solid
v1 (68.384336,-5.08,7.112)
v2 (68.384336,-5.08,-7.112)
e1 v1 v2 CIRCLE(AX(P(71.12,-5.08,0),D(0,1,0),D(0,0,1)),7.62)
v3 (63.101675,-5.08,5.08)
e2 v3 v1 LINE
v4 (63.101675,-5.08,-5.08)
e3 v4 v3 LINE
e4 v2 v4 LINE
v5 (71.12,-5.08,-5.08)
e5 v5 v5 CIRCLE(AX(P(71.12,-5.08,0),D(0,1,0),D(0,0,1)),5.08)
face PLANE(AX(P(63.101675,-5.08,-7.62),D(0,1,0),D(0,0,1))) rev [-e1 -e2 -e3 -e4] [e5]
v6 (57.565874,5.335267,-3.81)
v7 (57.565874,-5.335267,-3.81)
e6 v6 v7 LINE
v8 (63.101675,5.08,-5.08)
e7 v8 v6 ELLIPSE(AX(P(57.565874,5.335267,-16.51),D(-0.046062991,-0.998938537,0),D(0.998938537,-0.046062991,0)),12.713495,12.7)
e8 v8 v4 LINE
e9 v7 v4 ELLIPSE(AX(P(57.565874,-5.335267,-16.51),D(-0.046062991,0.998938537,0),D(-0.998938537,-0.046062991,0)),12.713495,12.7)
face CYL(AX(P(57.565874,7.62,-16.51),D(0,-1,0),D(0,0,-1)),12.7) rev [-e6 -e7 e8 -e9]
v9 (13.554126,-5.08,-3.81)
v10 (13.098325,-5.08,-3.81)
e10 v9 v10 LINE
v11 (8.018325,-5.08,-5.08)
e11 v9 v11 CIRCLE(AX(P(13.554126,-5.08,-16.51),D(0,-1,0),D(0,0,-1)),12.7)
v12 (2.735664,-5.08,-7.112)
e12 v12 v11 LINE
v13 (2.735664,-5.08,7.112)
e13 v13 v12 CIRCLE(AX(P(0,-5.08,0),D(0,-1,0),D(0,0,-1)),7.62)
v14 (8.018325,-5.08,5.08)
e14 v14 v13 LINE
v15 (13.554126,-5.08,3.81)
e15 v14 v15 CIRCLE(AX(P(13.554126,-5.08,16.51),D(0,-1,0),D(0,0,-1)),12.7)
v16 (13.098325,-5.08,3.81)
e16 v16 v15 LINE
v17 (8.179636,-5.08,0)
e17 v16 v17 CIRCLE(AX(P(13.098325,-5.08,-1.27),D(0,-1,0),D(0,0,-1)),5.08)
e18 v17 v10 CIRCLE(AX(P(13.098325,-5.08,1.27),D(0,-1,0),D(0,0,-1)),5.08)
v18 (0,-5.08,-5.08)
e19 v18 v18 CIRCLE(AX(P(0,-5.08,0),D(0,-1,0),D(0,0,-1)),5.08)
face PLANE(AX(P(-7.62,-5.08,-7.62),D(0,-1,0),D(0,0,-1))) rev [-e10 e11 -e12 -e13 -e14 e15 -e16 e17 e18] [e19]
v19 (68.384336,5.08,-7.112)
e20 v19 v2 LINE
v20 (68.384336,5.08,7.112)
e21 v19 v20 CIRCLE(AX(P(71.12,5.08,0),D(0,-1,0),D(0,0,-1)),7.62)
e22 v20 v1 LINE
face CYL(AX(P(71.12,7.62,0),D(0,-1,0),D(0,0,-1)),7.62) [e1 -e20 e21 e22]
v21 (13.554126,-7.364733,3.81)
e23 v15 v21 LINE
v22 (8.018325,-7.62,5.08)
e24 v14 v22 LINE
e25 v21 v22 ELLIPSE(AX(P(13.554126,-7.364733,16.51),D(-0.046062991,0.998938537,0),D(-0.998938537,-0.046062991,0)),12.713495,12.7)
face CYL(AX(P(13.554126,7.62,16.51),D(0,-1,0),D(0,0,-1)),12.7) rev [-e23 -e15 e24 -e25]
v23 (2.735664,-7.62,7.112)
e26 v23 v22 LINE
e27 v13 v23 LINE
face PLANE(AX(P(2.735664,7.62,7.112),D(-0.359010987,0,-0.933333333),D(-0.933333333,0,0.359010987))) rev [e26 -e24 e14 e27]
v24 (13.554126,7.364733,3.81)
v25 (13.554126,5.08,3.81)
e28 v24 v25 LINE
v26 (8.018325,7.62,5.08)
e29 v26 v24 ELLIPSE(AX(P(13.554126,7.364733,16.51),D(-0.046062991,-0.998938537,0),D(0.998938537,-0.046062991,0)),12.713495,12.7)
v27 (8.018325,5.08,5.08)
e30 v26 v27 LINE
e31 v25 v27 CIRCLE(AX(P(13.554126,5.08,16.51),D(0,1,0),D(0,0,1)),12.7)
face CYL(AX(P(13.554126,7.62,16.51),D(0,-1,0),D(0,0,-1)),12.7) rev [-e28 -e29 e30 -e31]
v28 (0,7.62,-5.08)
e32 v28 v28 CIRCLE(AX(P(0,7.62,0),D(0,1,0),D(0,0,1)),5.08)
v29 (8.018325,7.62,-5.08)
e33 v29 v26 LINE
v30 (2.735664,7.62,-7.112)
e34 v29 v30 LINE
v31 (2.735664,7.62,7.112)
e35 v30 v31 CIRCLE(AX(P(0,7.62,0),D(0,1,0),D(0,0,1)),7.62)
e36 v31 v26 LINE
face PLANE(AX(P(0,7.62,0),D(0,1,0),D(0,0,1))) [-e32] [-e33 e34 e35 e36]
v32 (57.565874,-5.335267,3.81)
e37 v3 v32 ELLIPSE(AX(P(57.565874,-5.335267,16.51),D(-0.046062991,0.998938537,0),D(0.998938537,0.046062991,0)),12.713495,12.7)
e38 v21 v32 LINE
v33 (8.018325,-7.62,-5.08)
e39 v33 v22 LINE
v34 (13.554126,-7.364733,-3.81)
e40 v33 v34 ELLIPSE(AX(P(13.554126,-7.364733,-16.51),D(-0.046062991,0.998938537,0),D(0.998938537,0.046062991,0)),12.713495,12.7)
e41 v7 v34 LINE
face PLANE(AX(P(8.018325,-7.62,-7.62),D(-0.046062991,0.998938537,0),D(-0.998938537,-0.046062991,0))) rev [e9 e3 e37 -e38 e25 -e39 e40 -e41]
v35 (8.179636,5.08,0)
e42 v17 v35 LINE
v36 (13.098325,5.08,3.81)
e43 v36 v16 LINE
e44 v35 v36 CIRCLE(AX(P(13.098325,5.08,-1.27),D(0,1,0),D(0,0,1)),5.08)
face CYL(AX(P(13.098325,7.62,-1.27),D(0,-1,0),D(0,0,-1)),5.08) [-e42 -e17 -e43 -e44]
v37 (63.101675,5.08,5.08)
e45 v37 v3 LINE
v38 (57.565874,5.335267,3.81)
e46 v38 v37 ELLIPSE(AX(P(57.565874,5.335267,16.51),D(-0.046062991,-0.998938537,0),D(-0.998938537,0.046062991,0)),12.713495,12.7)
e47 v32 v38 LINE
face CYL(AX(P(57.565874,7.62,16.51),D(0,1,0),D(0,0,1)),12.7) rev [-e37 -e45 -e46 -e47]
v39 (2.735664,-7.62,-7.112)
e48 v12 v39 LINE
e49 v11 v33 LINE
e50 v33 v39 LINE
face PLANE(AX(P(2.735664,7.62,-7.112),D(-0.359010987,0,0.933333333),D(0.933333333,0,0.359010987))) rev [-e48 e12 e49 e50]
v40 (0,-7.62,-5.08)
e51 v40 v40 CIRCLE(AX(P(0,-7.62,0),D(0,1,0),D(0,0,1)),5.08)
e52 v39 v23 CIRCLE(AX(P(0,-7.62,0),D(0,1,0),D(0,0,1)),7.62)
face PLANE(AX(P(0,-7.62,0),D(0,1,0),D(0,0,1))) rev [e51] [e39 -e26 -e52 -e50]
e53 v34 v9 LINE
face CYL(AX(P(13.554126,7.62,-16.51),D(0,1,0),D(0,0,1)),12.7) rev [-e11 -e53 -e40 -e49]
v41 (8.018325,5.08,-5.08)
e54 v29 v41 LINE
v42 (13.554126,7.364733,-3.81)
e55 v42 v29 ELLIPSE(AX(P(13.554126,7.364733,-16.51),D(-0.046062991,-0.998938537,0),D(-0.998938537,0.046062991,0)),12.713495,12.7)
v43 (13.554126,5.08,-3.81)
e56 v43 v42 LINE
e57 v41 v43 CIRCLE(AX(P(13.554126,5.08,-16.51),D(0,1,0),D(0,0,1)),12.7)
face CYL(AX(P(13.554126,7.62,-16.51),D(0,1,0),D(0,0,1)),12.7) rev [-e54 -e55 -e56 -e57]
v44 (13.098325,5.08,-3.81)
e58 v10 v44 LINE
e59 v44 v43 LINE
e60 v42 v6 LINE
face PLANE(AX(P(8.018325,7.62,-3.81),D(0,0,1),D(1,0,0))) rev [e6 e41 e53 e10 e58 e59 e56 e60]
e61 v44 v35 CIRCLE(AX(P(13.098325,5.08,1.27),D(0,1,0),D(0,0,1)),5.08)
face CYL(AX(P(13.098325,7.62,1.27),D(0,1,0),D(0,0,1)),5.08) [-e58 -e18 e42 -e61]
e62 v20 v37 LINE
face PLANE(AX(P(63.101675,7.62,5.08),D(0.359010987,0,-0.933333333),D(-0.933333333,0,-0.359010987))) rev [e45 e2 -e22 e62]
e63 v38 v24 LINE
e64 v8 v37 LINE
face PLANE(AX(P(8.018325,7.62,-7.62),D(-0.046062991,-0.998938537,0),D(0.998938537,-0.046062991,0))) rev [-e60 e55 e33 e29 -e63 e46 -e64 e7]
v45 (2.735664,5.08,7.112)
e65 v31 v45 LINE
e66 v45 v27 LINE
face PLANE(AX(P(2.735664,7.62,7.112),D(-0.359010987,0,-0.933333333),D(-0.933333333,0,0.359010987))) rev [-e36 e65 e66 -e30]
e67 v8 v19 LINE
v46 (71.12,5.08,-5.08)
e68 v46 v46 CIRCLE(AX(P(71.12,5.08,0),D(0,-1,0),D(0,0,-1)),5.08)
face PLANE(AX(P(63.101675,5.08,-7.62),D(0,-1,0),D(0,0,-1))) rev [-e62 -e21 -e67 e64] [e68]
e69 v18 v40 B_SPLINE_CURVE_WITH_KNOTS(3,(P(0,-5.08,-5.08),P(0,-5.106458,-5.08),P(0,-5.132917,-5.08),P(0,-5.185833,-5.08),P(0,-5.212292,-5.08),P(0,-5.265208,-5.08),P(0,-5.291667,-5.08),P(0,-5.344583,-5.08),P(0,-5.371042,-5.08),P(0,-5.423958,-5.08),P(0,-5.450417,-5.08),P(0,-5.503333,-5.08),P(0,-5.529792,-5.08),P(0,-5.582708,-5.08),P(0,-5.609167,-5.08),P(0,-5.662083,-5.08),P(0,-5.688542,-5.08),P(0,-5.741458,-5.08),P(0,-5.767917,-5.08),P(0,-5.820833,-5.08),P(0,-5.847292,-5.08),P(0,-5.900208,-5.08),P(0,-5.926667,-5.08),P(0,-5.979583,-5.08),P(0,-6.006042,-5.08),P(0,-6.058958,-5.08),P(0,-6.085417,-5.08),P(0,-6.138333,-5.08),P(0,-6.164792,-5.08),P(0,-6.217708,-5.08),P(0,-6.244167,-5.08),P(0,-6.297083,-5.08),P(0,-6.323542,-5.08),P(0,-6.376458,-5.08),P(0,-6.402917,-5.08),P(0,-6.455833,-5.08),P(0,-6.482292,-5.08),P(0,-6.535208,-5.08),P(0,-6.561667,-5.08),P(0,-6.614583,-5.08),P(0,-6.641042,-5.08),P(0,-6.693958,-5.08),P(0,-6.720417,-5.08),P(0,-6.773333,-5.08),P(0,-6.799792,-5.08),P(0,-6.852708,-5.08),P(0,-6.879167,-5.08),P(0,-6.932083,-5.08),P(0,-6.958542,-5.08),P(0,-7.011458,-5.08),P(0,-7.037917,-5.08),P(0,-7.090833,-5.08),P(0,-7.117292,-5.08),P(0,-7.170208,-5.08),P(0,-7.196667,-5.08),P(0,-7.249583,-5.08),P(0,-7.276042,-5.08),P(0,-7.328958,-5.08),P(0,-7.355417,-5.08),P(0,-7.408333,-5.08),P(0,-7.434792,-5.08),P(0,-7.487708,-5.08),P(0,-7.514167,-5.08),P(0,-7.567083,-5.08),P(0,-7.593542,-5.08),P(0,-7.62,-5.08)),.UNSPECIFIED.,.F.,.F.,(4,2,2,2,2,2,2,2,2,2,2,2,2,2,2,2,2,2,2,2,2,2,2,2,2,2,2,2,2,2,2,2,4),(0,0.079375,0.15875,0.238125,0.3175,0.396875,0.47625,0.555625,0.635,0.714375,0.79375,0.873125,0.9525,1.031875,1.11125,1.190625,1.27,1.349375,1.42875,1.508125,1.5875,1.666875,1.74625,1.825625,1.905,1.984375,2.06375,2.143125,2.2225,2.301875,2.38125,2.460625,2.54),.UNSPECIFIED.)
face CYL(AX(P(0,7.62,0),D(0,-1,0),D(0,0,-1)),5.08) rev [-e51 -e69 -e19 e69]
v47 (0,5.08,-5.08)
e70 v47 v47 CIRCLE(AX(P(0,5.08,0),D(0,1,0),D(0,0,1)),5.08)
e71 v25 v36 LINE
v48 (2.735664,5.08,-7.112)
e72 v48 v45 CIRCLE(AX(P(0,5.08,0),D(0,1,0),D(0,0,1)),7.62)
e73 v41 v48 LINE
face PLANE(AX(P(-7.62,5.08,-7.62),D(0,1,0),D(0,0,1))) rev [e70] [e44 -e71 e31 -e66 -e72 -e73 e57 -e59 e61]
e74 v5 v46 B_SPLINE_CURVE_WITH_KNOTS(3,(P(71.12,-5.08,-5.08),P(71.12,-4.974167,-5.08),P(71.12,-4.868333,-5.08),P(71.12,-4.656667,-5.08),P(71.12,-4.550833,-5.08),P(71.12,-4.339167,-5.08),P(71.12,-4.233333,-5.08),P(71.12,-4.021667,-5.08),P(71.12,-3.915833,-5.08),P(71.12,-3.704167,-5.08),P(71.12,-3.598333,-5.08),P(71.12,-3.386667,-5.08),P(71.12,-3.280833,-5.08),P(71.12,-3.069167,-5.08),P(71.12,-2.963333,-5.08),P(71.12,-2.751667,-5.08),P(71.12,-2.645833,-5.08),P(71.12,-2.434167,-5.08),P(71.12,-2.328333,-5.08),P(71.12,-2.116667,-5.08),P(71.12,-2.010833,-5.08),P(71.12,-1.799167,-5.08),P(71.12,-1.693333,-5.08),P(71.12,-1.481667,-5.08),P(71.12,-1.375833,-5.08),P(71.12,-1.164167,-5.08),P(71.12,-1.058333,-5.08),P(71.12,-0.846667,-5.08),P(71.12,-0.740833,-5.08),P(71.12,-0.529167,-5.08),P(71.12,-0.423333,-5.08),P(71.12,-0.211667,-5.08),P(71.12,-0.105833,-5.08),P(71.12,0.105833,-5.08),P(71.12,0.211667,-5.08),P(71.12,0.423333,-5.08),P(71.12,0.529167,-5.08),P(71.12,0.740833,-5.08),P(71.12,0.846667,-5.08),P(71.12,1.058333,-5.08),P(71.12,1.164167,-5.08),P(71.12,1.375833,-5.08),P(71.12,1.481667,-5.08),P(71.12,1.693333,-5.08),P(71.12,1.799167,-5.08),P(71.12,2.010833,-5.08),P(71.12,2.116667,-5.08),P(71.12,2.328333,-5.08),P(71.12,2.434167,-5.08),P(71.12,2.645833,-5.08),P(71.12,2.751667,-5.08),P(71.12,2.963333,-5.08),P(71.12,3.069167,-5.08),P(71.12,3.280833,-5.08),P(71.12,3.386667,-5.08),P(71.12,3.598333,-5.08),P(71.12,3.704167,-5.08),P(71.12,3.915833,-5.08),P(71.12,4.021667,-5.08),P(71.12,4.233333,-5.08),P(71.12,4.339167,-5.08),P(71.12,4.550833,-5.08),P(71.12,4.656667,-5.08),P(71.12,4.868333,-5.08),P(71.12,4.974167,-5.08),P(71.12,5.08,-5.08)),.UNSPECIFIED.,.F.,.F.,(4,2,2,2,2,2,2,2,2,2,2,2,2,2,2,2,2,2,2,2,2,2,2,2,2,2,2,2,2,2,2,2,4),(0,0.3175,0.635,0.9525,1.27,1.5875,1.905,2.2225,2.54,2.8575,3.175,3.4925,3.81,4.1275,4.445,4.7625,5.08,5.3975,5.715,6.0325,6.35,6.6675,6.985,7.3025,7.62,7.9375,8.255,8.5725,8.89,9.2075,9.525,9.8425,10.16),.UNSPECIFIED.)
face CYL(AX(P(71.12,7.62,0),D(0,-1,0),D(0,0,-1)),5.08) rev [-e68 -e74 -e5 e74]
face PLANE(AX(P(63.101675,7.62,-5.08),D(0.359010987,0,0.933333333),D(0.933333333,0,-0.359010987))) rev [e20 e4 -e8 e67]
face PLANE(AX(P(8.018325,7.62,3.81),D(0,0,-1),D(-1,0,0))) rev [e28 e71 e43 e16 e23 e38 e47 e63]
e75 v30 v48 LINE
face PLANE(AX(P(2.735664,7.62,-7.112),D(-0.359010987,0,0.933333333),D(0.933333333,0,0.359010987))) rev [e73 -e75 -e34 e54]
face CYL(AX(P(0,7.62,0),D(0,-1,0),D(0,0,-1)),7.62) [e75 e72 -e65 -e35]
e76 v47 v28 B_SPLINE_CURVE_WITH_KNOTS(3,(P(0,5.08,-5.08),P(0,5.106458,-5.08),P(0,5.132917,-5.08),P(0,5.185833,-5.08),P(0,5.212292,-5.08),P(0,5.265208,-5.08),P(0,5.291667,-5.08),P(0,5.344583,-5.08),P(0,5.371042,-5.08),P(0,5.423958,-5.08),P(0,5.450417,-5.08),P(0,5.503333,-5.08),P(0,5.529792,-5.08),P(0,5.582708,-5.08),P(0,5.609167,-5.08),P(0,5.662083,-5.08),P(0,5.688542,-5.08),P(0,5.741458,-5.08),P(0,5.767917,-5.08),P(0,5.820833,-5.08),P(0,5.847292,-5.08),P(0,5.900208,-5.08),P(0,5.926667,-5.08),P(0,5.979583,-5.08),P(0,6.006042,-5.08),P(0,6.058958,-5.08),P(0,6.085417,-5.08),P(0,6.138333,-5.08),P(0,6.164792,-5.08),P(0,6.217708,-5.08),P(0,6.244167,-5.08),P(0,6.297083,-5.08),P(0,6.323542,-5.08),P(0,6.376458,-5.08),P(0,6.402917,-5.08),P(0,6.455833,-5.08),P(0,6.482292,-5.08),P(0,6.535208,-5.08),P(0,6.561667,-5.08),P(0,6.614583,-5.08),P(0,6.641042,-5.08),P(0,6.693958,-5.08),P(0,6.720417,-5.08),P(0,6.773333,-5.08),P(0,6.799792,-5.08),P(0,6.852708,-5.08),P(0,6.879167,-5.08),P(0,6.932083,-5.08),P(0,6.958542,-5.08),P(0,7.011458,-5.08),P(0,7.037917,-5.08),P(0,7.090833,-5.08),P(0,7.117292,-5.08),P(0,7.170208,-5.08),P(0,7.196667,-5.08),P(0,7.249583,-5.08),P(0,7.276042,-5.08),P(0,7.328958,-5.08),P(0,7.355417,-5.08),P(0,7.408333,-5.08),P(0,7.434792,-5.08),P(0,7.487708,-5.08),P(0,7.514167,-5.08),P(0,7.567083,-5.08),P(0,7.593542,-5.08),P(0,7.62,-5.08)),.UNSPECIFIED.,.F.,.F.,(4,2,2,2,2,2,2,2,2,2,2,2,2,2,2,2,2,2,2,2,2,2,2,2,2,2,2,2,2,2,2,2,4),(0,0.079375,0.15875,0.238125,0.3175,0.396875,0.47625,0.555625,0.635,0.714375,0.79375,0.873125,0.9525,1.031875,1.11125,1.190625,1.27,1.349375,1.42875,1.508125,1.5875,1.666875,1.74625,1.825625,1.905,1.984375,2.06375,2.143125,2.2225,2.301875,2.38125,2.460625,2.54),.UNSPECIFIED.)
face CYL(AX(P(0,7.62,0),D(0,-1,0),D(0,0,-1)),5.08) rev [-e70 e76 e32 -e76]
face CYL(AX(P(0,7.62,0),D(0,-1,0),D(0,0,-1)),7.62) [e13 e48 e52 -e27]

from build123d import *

# Parameters (mm, degrees)
SKETCH1_R           = 5.08
BOSS_EXTRUDE1_DEPTH = 7.62
SKETCH2_W           = 15.638324702
SKETCH2_H           = 10.16
CUT_EXTRUDE1_DEPTH  = 83.001098163
FILLET1_R           = 12.7
FILLET2_R           = 5.08


with BuildPart() as part:
    # Sketch1 → Boss-Extrude1 (new, symmetric)
    with BuildSketch(Plane(origin=(0, 0, 0), x_dir=(1, 0, 0), z_dir=(0, 1, 0))):
        with BuildLine():
            Line((2.735663722, 7.112), (8.018324702, 5.08))
            Line((8.018324702, 5.08), (8.018324702, 3.81))
            Line((8.018324702, 3.81), (63.101675298, 3.81))
            Line((63.101675298, 3.81), (63.101675298, 5.08))
            Line((63.101675298, 5.08), (68.384336278, 7.112))
            ThreePointArc((68.384336278, 7.112), (78.74, 0), (68.384336278, -7.112))
            Line((68.384336278, -7.112), (63.101675298, -5.08))
            Line((63.101675298, -5.08), (63.101675298, -3.81))
            Line((63.101675298, -3.81), (8.018324702, -3.81))
            Line((8.018324702, -3.81), (8.018324702, -5.08))
            Line((8.018324702, -5.08), (2.735663722, -7.112))
            ThreePointArc((2.735663722, -7.112), (-7.62, 0), (2.735663722, 7.112))
        make_face()
        with Locations(Location((0, 0, 0), (0, 0, 90))):
            Circle(SKETCH1_R, mode=Mode.SUBTRACT)
        with Locations(Location((71.12, 0, 0), (0, 0, 90))):
            Circle(SKETCH1_R, mode=Mode.SUBTRACT)
    extrude(amount=BOSS_EXTRUDE1_DEPTH, both=True)

    # Sketch2 → Cut-Extrude1 (cut, through all)
    with BuildSketch(Plane.XY.offset(13.97)):
        Polygon((8.018324702, 7.62), (63.101675298, 5.08), (78.74, 5.08), (78.74, 7.62), align=None)
        with Locations((0.199162351, 0)):
            Rectangle(SKETCH2_W, SKETCH2_H)
        Polygon((63.101675298, -5.08), (78.74, -5.08), (78.74, -7.62), (8.018324702, -7.62), align=None)
    extrude(amount=-CUT_EXTRUDE1_DEPTH, mode=Mode.SUBTRACT)

    # Fillet1
    # the kernel refuses this fillet: 12.7 mm, written as the material it adds along each edge
    with BuildSketch(Plane(origin=(63.101675298, 18.919504146, 3.81), x_dir=(-1, 0, 0), z_dir=(0, -1, 0))) as fillet1_piece_1_section:
        with BuildLine():
            CenterArc((5.535801658, -12.7), FILLET1_R, 90, 25.841932763)
            Line((0, -1.27), (0, 0))
            Line((0, 0), (5.535801658, 0))
        make_face()
    fillet1_piece_1 = extrude(amount=37.839008291, mode=Mode.PRIVATE)
    fillet1_piece_1 = split(fillet1_piece_1, bisect_by=Plane(origin=(59.36502655, 5.252304112, 3.912132652), z_dir=(-0.04606299102663346, -0.9989385370770718, 0)), keep=Keep.TOP, mode=Mode.PRIVATE)
    fillet1_piece_1 = split(fillet1_piece_1, bisect_by=Plane(origin=(59.844275634, -5.230205009, 3.912132652), z_dir=(-0.04606299102663346, 0.9989385370770718, 0)), keep=Keep.TOP, mode=Mode.PRIVATE)
    add(fillet1_piece_1)
    with BuildSketch(Plane(origin=(63.101675298, 18.919504146, -3.81), x_dir=(0, 0, -1), z_dir=(0, -1, 0))) as fillet1_piece_2_section:
        with BuildLine():
            CenterArc((12.7, -5.535801658), FILLET1_R, 154.158067237, 25.841932763)
            Line((0, -5.535801658), (0, 0))
            Line((0, 0), (1.27, 0))
        make_face()
    fillet1_piece_2 = extrude(amount=37.839008291, mode=Mode.PRIVATE)
    fillet1_piece_2 = split(fillet1_piece_2, bisect_by=Plane(origin=(62.135782482, 5.124539189, -4.63296), z_dir=(-0.04606299102663346, -0.9989385370770718, 0)), keep=Keep.TOP, mode=Mode.PRIVATE)
    fillet1_piece_2 = split(fillet1_piece_2, bisect_by=Plane(origin=(62.604689444, -5.10291698, -4.63296), z_dir=(-0.04606299102663346, 0.9989385370770718, 0)), keep=Keep.TOP, mode=Mode.PRIVATE)
    add(fillet1_piece_2)
    with BuildSketch(Plane(origin=(8.018324702, 8.759504146, -3.81), x_dir=(1, 0, 0), z_dir=(0, -1, 0))) as fillet1_piece_3_section:
        with BuildLine():
            CenterArc((5.535801658, -12.7), FILLET1_R, 90, 25.841932763)
            Line((0, -1.27), (0, 0))
            Line((0, 0), (5.535801658, 0))
        make_face()
    fillet1_piece_3 = extrude(amount=30.219008291, mode=Mode.PRIVATE)
    fillet1_piece_3 = split(fillet1_piece_3, bisect_by=Plane(origin=(11.809644031, 7.445174921, -3.912132652), z_dir=(-0.04606299102663346, -0.9989385370770718, 0)), keep=Keep.TOP, mode=Mode.PRIVATE)
    fillet1_piece_3 = split(fillet1_piece_3, bisect_by=Plane(origin=(11.757033309, 5.08, -3.912132652), z_dir=(0, 1, 0)), keep=Keep.TOP, mode=Mode.PRIVATE)
    add(fillet1_piece_3)
    with BuildSketch(Plane(origin=(8.018324702, -5.08, -3.81), x_dir=(1, 0, 0), z_dir=(0, -1, 0))) as fillet1_piece_4_section:
        with BuildLine():
            CenterArc((5.535801658, -12.7), FILLET1_R, 90, 25.841932763)
            Line((0, -1.27), (0, 0))
            Line((0, 0), (5.535801658, 0))
        make_face()
    fillet1_piece_4 = extrude(amount=16.379504146, mode=Mode.PRIVATE)
    fillet1_piece_4 = split(fillet1_piece_4, bisect_by=Plane(origin=(11.809644031, -7.445174921, -3.912132652), z_dir=(-0.04606299102663346, 0.9989385370770718, 0)), keep=Keep.TOP, mode=Mode.PRIVATE)
    add(fillet1_piece_4)
    with BuildSketch(Plane(origin=(8.018324702, 21.459504146, -3.81), x_dir=(1, 0, 0), z_dir=(0, -1, 0))) as fillet1_piece_5_section:
        with BuildLine():
            CenterArc((5.535801658, -12.7), FILLET1_R, 90, 25.841932763)
            Line((0, -1.27), (0, 0))
            Line((0, 0), (5.535801658, 0))
        make_face()
    fillet1_piece_5 = extrude(amount=16.379504146, mode=Mode.PRIVATE)
    fillet1_piece_5 = split(fillet1_piece_5, bisect_by=Plane(origin=(11.809644031, 7.445174921, -3.912132652), z_dir=(-0.04606299102663346, -0.9989385370770718, 0)), keep=Keep.TOP, mode=Mode.PRIVATE)
    add(fillet1_piece_5)
    with BuildSketch(Plane(origin=(8.018324702, 21.459504146, -3.81), x_dir=(1, 0, 0), z_dir=(0, -1, 0))) as fillet1_piece_6_section:
        with BuildLine():
            CenterArc((5.535801658, -12.7), FILLET1_R, 90, 25.841932763)
            Line((0, -1.27), (0, 0))
            Line((0, 0), (5.535801658, 0))
        make_face()
    fillet1_piece_6 = extrude(amount=30.219008291, mode=Mode.PRIVATE)
    fillet1_piece_6 = split(fillet1_piece_6, bisect_by=Plane(origin=(11.757033309, -5.08, -3.912132652), z_dir=(0, -1, 0)), keep=Keep.TOP, mode=Mode.PRIVATE)
    fillet1_piece_6 = split(fillet1_piece_6, bisect_by=Plane(origin=(11.809644031, -7.445174921, -3.912132652), z_dir=(-0.04606299102663346, 0.9989385370770718, 0)), keep=Keep.TOP, mode=Mode.PRIVATE)
    add(fillet1_piece_6)
    with BuildSketch(Plane(origin=(8.018324702, 8.759504146, 3.81), x_dir=(1, 0, 0), z_dir=(0, -1, 0))) as fillet1_piece_7_section:
        with BuildLine():
            CenterArc((5.535801658, 12.7), FILLET1_R, 244.158067237, 25.841932763)
            Line((0, 1.27), (0, 0))
            Line((0, 0), (5.535801658, 0))
        make_face()
    fillet1_piece_7 = extrude(amount=30.219008291, mode=Mode.PRIVATE)
    fillet1_piece_7 = split(fillet1_piece_7, bisect_by=Plane(origin=(11.809644031, 7.445174921, 3.912132652), z_dir=(-0.04606299102663346, -0.9989385370770718, 0)), keep=Keep.TOP, mode=Mode.PRIVATE)
    fillet1_piece_7 = split(fillet1_piece_7, bisect_by=Plane(origin=(11.757033309, 5.08, 3.912132652), z_dir=(0, 1, 0)), keep=Keep.TOP, mode=Mode.PRIVATE)
    add(fillet1_piece_7)
    with BuildSketch(Plane(origin=(8.018324702, -5.08, 3.81), x_dir=(1, 0, 0), z_dir=(0, -1, 0))) as fillet1_piece_8_section:
        with BuildLine():
            CenterArc((5.535801658, 12.7), FILLET1_R, 244.158067237, 25.841932763)
            Line((0, 1.27), (0, 0))
            Line((0, 0), (5.535801658, 0))
        make_face()
    fillet1_piece_8 = extrude(amount=16.379504146, mode=Mode.PRIVATE)
    fillet1_piece_8 = split(fillet1_piece_8, bisect_by=Plane(origin=(11.809644031, -7.445174921, 3.912132652), z_dir=(-0.04606299102663346, 0.9989385370770718, 0)), keep=Keep.TOP, mode=Mode.PRIVATE)
    add(fillet1_piece_8)
    with BuildSketch(Plane(origin=(8.018324702, 21.459504146, 3.81), x_dir=(0, 0, 1), z_dir=(0, -1, 0))) as fillet1_piece_9_section:
        with BuildLine():
            CenterArc((12.7, -5.535801658), FILLET1_R, 154.158067237, 25.841932763)
            Line((0, -5.535801658), (0, 0))
            Line((0, 0), (1.27, 0))
        make_face()
    fillet1_piece_9 = extrude(amount=16.379504146, mode=Mode.PRIVATE)
    fillet1_piece_9 = split(fillet1_piece_9, bisect_by=Plane(origin=(9.041953552, 7.572798491, 4.63296), z_dir=(-0.04606299102663346, -0.9989385370770718, 0)), keep=Keep.TOP, mode=Mode.PRIVATE)
    add(fillet1_piece_9)
    with BuildSketch(Plane(origin=(8.018324702, 21.459504146, 3.81), x_dir=(0, 0, 1), z_dir=(0, -1, 0))) as fillet1_piece_10_section:
        with BuildLine():
            CenterArc((12.7, -5.535801658), FILLET1_R, 154.158067237, 25.841932763)
            Line((0, -5.535801658), (0, 0))
            Line((0, 0), (1.27, 0))
        make_face()
    fillet1_piece_10 = extrude(amount=30.219008291, mode=Mode.PRIVATE)
    fillet1_piece_10 = split(fillet1_piece_10, bisect_by=Plane(origin=(8.985567945, -5.08, 4.63296), z_dir=(0, -1, 0)), keep=Keep.TOP, mode=Mode.PRIVATE)
    fillet1_piece_10 = split(fillet1_piece_10, bisect_by=Plane(origin=(9.041953552, -7.572798491, 4.63296), z_dir=(-0.04606299102663346, 0.9989385370770718, 0)), keep=Keep.TOP, mode=Mode.PRIVATE)
    add(fillet1_piece_10)

    # Fillet2
    # the kernel refuses this fillet: 5.08 mm, written as the material it takes off along each edge
    with BuildSketch(Plane(origin=(8.018324702, 5.08, -3.81), x_dir=(1, 0, 0), z_dir=(0, -1, 0)), Plane(origin=(8.018324702, 5.08, 3.81), x_dir=(0, 0, -1), z_dir=(0, -1, 0))) as fillet2_piece_1:
        with BuildLine():
            CenterArc((FILLET2_R, FILLET2_R), FILLET2_R, 180, 90)
            Line((0, FILLET2_R), (0, 0))
            Line((0, 0), (FILLET2_R, 0))
        make_face()
    extrude(amount=10.16, mode=Mode.SUBTRACT)


solid = part.part
